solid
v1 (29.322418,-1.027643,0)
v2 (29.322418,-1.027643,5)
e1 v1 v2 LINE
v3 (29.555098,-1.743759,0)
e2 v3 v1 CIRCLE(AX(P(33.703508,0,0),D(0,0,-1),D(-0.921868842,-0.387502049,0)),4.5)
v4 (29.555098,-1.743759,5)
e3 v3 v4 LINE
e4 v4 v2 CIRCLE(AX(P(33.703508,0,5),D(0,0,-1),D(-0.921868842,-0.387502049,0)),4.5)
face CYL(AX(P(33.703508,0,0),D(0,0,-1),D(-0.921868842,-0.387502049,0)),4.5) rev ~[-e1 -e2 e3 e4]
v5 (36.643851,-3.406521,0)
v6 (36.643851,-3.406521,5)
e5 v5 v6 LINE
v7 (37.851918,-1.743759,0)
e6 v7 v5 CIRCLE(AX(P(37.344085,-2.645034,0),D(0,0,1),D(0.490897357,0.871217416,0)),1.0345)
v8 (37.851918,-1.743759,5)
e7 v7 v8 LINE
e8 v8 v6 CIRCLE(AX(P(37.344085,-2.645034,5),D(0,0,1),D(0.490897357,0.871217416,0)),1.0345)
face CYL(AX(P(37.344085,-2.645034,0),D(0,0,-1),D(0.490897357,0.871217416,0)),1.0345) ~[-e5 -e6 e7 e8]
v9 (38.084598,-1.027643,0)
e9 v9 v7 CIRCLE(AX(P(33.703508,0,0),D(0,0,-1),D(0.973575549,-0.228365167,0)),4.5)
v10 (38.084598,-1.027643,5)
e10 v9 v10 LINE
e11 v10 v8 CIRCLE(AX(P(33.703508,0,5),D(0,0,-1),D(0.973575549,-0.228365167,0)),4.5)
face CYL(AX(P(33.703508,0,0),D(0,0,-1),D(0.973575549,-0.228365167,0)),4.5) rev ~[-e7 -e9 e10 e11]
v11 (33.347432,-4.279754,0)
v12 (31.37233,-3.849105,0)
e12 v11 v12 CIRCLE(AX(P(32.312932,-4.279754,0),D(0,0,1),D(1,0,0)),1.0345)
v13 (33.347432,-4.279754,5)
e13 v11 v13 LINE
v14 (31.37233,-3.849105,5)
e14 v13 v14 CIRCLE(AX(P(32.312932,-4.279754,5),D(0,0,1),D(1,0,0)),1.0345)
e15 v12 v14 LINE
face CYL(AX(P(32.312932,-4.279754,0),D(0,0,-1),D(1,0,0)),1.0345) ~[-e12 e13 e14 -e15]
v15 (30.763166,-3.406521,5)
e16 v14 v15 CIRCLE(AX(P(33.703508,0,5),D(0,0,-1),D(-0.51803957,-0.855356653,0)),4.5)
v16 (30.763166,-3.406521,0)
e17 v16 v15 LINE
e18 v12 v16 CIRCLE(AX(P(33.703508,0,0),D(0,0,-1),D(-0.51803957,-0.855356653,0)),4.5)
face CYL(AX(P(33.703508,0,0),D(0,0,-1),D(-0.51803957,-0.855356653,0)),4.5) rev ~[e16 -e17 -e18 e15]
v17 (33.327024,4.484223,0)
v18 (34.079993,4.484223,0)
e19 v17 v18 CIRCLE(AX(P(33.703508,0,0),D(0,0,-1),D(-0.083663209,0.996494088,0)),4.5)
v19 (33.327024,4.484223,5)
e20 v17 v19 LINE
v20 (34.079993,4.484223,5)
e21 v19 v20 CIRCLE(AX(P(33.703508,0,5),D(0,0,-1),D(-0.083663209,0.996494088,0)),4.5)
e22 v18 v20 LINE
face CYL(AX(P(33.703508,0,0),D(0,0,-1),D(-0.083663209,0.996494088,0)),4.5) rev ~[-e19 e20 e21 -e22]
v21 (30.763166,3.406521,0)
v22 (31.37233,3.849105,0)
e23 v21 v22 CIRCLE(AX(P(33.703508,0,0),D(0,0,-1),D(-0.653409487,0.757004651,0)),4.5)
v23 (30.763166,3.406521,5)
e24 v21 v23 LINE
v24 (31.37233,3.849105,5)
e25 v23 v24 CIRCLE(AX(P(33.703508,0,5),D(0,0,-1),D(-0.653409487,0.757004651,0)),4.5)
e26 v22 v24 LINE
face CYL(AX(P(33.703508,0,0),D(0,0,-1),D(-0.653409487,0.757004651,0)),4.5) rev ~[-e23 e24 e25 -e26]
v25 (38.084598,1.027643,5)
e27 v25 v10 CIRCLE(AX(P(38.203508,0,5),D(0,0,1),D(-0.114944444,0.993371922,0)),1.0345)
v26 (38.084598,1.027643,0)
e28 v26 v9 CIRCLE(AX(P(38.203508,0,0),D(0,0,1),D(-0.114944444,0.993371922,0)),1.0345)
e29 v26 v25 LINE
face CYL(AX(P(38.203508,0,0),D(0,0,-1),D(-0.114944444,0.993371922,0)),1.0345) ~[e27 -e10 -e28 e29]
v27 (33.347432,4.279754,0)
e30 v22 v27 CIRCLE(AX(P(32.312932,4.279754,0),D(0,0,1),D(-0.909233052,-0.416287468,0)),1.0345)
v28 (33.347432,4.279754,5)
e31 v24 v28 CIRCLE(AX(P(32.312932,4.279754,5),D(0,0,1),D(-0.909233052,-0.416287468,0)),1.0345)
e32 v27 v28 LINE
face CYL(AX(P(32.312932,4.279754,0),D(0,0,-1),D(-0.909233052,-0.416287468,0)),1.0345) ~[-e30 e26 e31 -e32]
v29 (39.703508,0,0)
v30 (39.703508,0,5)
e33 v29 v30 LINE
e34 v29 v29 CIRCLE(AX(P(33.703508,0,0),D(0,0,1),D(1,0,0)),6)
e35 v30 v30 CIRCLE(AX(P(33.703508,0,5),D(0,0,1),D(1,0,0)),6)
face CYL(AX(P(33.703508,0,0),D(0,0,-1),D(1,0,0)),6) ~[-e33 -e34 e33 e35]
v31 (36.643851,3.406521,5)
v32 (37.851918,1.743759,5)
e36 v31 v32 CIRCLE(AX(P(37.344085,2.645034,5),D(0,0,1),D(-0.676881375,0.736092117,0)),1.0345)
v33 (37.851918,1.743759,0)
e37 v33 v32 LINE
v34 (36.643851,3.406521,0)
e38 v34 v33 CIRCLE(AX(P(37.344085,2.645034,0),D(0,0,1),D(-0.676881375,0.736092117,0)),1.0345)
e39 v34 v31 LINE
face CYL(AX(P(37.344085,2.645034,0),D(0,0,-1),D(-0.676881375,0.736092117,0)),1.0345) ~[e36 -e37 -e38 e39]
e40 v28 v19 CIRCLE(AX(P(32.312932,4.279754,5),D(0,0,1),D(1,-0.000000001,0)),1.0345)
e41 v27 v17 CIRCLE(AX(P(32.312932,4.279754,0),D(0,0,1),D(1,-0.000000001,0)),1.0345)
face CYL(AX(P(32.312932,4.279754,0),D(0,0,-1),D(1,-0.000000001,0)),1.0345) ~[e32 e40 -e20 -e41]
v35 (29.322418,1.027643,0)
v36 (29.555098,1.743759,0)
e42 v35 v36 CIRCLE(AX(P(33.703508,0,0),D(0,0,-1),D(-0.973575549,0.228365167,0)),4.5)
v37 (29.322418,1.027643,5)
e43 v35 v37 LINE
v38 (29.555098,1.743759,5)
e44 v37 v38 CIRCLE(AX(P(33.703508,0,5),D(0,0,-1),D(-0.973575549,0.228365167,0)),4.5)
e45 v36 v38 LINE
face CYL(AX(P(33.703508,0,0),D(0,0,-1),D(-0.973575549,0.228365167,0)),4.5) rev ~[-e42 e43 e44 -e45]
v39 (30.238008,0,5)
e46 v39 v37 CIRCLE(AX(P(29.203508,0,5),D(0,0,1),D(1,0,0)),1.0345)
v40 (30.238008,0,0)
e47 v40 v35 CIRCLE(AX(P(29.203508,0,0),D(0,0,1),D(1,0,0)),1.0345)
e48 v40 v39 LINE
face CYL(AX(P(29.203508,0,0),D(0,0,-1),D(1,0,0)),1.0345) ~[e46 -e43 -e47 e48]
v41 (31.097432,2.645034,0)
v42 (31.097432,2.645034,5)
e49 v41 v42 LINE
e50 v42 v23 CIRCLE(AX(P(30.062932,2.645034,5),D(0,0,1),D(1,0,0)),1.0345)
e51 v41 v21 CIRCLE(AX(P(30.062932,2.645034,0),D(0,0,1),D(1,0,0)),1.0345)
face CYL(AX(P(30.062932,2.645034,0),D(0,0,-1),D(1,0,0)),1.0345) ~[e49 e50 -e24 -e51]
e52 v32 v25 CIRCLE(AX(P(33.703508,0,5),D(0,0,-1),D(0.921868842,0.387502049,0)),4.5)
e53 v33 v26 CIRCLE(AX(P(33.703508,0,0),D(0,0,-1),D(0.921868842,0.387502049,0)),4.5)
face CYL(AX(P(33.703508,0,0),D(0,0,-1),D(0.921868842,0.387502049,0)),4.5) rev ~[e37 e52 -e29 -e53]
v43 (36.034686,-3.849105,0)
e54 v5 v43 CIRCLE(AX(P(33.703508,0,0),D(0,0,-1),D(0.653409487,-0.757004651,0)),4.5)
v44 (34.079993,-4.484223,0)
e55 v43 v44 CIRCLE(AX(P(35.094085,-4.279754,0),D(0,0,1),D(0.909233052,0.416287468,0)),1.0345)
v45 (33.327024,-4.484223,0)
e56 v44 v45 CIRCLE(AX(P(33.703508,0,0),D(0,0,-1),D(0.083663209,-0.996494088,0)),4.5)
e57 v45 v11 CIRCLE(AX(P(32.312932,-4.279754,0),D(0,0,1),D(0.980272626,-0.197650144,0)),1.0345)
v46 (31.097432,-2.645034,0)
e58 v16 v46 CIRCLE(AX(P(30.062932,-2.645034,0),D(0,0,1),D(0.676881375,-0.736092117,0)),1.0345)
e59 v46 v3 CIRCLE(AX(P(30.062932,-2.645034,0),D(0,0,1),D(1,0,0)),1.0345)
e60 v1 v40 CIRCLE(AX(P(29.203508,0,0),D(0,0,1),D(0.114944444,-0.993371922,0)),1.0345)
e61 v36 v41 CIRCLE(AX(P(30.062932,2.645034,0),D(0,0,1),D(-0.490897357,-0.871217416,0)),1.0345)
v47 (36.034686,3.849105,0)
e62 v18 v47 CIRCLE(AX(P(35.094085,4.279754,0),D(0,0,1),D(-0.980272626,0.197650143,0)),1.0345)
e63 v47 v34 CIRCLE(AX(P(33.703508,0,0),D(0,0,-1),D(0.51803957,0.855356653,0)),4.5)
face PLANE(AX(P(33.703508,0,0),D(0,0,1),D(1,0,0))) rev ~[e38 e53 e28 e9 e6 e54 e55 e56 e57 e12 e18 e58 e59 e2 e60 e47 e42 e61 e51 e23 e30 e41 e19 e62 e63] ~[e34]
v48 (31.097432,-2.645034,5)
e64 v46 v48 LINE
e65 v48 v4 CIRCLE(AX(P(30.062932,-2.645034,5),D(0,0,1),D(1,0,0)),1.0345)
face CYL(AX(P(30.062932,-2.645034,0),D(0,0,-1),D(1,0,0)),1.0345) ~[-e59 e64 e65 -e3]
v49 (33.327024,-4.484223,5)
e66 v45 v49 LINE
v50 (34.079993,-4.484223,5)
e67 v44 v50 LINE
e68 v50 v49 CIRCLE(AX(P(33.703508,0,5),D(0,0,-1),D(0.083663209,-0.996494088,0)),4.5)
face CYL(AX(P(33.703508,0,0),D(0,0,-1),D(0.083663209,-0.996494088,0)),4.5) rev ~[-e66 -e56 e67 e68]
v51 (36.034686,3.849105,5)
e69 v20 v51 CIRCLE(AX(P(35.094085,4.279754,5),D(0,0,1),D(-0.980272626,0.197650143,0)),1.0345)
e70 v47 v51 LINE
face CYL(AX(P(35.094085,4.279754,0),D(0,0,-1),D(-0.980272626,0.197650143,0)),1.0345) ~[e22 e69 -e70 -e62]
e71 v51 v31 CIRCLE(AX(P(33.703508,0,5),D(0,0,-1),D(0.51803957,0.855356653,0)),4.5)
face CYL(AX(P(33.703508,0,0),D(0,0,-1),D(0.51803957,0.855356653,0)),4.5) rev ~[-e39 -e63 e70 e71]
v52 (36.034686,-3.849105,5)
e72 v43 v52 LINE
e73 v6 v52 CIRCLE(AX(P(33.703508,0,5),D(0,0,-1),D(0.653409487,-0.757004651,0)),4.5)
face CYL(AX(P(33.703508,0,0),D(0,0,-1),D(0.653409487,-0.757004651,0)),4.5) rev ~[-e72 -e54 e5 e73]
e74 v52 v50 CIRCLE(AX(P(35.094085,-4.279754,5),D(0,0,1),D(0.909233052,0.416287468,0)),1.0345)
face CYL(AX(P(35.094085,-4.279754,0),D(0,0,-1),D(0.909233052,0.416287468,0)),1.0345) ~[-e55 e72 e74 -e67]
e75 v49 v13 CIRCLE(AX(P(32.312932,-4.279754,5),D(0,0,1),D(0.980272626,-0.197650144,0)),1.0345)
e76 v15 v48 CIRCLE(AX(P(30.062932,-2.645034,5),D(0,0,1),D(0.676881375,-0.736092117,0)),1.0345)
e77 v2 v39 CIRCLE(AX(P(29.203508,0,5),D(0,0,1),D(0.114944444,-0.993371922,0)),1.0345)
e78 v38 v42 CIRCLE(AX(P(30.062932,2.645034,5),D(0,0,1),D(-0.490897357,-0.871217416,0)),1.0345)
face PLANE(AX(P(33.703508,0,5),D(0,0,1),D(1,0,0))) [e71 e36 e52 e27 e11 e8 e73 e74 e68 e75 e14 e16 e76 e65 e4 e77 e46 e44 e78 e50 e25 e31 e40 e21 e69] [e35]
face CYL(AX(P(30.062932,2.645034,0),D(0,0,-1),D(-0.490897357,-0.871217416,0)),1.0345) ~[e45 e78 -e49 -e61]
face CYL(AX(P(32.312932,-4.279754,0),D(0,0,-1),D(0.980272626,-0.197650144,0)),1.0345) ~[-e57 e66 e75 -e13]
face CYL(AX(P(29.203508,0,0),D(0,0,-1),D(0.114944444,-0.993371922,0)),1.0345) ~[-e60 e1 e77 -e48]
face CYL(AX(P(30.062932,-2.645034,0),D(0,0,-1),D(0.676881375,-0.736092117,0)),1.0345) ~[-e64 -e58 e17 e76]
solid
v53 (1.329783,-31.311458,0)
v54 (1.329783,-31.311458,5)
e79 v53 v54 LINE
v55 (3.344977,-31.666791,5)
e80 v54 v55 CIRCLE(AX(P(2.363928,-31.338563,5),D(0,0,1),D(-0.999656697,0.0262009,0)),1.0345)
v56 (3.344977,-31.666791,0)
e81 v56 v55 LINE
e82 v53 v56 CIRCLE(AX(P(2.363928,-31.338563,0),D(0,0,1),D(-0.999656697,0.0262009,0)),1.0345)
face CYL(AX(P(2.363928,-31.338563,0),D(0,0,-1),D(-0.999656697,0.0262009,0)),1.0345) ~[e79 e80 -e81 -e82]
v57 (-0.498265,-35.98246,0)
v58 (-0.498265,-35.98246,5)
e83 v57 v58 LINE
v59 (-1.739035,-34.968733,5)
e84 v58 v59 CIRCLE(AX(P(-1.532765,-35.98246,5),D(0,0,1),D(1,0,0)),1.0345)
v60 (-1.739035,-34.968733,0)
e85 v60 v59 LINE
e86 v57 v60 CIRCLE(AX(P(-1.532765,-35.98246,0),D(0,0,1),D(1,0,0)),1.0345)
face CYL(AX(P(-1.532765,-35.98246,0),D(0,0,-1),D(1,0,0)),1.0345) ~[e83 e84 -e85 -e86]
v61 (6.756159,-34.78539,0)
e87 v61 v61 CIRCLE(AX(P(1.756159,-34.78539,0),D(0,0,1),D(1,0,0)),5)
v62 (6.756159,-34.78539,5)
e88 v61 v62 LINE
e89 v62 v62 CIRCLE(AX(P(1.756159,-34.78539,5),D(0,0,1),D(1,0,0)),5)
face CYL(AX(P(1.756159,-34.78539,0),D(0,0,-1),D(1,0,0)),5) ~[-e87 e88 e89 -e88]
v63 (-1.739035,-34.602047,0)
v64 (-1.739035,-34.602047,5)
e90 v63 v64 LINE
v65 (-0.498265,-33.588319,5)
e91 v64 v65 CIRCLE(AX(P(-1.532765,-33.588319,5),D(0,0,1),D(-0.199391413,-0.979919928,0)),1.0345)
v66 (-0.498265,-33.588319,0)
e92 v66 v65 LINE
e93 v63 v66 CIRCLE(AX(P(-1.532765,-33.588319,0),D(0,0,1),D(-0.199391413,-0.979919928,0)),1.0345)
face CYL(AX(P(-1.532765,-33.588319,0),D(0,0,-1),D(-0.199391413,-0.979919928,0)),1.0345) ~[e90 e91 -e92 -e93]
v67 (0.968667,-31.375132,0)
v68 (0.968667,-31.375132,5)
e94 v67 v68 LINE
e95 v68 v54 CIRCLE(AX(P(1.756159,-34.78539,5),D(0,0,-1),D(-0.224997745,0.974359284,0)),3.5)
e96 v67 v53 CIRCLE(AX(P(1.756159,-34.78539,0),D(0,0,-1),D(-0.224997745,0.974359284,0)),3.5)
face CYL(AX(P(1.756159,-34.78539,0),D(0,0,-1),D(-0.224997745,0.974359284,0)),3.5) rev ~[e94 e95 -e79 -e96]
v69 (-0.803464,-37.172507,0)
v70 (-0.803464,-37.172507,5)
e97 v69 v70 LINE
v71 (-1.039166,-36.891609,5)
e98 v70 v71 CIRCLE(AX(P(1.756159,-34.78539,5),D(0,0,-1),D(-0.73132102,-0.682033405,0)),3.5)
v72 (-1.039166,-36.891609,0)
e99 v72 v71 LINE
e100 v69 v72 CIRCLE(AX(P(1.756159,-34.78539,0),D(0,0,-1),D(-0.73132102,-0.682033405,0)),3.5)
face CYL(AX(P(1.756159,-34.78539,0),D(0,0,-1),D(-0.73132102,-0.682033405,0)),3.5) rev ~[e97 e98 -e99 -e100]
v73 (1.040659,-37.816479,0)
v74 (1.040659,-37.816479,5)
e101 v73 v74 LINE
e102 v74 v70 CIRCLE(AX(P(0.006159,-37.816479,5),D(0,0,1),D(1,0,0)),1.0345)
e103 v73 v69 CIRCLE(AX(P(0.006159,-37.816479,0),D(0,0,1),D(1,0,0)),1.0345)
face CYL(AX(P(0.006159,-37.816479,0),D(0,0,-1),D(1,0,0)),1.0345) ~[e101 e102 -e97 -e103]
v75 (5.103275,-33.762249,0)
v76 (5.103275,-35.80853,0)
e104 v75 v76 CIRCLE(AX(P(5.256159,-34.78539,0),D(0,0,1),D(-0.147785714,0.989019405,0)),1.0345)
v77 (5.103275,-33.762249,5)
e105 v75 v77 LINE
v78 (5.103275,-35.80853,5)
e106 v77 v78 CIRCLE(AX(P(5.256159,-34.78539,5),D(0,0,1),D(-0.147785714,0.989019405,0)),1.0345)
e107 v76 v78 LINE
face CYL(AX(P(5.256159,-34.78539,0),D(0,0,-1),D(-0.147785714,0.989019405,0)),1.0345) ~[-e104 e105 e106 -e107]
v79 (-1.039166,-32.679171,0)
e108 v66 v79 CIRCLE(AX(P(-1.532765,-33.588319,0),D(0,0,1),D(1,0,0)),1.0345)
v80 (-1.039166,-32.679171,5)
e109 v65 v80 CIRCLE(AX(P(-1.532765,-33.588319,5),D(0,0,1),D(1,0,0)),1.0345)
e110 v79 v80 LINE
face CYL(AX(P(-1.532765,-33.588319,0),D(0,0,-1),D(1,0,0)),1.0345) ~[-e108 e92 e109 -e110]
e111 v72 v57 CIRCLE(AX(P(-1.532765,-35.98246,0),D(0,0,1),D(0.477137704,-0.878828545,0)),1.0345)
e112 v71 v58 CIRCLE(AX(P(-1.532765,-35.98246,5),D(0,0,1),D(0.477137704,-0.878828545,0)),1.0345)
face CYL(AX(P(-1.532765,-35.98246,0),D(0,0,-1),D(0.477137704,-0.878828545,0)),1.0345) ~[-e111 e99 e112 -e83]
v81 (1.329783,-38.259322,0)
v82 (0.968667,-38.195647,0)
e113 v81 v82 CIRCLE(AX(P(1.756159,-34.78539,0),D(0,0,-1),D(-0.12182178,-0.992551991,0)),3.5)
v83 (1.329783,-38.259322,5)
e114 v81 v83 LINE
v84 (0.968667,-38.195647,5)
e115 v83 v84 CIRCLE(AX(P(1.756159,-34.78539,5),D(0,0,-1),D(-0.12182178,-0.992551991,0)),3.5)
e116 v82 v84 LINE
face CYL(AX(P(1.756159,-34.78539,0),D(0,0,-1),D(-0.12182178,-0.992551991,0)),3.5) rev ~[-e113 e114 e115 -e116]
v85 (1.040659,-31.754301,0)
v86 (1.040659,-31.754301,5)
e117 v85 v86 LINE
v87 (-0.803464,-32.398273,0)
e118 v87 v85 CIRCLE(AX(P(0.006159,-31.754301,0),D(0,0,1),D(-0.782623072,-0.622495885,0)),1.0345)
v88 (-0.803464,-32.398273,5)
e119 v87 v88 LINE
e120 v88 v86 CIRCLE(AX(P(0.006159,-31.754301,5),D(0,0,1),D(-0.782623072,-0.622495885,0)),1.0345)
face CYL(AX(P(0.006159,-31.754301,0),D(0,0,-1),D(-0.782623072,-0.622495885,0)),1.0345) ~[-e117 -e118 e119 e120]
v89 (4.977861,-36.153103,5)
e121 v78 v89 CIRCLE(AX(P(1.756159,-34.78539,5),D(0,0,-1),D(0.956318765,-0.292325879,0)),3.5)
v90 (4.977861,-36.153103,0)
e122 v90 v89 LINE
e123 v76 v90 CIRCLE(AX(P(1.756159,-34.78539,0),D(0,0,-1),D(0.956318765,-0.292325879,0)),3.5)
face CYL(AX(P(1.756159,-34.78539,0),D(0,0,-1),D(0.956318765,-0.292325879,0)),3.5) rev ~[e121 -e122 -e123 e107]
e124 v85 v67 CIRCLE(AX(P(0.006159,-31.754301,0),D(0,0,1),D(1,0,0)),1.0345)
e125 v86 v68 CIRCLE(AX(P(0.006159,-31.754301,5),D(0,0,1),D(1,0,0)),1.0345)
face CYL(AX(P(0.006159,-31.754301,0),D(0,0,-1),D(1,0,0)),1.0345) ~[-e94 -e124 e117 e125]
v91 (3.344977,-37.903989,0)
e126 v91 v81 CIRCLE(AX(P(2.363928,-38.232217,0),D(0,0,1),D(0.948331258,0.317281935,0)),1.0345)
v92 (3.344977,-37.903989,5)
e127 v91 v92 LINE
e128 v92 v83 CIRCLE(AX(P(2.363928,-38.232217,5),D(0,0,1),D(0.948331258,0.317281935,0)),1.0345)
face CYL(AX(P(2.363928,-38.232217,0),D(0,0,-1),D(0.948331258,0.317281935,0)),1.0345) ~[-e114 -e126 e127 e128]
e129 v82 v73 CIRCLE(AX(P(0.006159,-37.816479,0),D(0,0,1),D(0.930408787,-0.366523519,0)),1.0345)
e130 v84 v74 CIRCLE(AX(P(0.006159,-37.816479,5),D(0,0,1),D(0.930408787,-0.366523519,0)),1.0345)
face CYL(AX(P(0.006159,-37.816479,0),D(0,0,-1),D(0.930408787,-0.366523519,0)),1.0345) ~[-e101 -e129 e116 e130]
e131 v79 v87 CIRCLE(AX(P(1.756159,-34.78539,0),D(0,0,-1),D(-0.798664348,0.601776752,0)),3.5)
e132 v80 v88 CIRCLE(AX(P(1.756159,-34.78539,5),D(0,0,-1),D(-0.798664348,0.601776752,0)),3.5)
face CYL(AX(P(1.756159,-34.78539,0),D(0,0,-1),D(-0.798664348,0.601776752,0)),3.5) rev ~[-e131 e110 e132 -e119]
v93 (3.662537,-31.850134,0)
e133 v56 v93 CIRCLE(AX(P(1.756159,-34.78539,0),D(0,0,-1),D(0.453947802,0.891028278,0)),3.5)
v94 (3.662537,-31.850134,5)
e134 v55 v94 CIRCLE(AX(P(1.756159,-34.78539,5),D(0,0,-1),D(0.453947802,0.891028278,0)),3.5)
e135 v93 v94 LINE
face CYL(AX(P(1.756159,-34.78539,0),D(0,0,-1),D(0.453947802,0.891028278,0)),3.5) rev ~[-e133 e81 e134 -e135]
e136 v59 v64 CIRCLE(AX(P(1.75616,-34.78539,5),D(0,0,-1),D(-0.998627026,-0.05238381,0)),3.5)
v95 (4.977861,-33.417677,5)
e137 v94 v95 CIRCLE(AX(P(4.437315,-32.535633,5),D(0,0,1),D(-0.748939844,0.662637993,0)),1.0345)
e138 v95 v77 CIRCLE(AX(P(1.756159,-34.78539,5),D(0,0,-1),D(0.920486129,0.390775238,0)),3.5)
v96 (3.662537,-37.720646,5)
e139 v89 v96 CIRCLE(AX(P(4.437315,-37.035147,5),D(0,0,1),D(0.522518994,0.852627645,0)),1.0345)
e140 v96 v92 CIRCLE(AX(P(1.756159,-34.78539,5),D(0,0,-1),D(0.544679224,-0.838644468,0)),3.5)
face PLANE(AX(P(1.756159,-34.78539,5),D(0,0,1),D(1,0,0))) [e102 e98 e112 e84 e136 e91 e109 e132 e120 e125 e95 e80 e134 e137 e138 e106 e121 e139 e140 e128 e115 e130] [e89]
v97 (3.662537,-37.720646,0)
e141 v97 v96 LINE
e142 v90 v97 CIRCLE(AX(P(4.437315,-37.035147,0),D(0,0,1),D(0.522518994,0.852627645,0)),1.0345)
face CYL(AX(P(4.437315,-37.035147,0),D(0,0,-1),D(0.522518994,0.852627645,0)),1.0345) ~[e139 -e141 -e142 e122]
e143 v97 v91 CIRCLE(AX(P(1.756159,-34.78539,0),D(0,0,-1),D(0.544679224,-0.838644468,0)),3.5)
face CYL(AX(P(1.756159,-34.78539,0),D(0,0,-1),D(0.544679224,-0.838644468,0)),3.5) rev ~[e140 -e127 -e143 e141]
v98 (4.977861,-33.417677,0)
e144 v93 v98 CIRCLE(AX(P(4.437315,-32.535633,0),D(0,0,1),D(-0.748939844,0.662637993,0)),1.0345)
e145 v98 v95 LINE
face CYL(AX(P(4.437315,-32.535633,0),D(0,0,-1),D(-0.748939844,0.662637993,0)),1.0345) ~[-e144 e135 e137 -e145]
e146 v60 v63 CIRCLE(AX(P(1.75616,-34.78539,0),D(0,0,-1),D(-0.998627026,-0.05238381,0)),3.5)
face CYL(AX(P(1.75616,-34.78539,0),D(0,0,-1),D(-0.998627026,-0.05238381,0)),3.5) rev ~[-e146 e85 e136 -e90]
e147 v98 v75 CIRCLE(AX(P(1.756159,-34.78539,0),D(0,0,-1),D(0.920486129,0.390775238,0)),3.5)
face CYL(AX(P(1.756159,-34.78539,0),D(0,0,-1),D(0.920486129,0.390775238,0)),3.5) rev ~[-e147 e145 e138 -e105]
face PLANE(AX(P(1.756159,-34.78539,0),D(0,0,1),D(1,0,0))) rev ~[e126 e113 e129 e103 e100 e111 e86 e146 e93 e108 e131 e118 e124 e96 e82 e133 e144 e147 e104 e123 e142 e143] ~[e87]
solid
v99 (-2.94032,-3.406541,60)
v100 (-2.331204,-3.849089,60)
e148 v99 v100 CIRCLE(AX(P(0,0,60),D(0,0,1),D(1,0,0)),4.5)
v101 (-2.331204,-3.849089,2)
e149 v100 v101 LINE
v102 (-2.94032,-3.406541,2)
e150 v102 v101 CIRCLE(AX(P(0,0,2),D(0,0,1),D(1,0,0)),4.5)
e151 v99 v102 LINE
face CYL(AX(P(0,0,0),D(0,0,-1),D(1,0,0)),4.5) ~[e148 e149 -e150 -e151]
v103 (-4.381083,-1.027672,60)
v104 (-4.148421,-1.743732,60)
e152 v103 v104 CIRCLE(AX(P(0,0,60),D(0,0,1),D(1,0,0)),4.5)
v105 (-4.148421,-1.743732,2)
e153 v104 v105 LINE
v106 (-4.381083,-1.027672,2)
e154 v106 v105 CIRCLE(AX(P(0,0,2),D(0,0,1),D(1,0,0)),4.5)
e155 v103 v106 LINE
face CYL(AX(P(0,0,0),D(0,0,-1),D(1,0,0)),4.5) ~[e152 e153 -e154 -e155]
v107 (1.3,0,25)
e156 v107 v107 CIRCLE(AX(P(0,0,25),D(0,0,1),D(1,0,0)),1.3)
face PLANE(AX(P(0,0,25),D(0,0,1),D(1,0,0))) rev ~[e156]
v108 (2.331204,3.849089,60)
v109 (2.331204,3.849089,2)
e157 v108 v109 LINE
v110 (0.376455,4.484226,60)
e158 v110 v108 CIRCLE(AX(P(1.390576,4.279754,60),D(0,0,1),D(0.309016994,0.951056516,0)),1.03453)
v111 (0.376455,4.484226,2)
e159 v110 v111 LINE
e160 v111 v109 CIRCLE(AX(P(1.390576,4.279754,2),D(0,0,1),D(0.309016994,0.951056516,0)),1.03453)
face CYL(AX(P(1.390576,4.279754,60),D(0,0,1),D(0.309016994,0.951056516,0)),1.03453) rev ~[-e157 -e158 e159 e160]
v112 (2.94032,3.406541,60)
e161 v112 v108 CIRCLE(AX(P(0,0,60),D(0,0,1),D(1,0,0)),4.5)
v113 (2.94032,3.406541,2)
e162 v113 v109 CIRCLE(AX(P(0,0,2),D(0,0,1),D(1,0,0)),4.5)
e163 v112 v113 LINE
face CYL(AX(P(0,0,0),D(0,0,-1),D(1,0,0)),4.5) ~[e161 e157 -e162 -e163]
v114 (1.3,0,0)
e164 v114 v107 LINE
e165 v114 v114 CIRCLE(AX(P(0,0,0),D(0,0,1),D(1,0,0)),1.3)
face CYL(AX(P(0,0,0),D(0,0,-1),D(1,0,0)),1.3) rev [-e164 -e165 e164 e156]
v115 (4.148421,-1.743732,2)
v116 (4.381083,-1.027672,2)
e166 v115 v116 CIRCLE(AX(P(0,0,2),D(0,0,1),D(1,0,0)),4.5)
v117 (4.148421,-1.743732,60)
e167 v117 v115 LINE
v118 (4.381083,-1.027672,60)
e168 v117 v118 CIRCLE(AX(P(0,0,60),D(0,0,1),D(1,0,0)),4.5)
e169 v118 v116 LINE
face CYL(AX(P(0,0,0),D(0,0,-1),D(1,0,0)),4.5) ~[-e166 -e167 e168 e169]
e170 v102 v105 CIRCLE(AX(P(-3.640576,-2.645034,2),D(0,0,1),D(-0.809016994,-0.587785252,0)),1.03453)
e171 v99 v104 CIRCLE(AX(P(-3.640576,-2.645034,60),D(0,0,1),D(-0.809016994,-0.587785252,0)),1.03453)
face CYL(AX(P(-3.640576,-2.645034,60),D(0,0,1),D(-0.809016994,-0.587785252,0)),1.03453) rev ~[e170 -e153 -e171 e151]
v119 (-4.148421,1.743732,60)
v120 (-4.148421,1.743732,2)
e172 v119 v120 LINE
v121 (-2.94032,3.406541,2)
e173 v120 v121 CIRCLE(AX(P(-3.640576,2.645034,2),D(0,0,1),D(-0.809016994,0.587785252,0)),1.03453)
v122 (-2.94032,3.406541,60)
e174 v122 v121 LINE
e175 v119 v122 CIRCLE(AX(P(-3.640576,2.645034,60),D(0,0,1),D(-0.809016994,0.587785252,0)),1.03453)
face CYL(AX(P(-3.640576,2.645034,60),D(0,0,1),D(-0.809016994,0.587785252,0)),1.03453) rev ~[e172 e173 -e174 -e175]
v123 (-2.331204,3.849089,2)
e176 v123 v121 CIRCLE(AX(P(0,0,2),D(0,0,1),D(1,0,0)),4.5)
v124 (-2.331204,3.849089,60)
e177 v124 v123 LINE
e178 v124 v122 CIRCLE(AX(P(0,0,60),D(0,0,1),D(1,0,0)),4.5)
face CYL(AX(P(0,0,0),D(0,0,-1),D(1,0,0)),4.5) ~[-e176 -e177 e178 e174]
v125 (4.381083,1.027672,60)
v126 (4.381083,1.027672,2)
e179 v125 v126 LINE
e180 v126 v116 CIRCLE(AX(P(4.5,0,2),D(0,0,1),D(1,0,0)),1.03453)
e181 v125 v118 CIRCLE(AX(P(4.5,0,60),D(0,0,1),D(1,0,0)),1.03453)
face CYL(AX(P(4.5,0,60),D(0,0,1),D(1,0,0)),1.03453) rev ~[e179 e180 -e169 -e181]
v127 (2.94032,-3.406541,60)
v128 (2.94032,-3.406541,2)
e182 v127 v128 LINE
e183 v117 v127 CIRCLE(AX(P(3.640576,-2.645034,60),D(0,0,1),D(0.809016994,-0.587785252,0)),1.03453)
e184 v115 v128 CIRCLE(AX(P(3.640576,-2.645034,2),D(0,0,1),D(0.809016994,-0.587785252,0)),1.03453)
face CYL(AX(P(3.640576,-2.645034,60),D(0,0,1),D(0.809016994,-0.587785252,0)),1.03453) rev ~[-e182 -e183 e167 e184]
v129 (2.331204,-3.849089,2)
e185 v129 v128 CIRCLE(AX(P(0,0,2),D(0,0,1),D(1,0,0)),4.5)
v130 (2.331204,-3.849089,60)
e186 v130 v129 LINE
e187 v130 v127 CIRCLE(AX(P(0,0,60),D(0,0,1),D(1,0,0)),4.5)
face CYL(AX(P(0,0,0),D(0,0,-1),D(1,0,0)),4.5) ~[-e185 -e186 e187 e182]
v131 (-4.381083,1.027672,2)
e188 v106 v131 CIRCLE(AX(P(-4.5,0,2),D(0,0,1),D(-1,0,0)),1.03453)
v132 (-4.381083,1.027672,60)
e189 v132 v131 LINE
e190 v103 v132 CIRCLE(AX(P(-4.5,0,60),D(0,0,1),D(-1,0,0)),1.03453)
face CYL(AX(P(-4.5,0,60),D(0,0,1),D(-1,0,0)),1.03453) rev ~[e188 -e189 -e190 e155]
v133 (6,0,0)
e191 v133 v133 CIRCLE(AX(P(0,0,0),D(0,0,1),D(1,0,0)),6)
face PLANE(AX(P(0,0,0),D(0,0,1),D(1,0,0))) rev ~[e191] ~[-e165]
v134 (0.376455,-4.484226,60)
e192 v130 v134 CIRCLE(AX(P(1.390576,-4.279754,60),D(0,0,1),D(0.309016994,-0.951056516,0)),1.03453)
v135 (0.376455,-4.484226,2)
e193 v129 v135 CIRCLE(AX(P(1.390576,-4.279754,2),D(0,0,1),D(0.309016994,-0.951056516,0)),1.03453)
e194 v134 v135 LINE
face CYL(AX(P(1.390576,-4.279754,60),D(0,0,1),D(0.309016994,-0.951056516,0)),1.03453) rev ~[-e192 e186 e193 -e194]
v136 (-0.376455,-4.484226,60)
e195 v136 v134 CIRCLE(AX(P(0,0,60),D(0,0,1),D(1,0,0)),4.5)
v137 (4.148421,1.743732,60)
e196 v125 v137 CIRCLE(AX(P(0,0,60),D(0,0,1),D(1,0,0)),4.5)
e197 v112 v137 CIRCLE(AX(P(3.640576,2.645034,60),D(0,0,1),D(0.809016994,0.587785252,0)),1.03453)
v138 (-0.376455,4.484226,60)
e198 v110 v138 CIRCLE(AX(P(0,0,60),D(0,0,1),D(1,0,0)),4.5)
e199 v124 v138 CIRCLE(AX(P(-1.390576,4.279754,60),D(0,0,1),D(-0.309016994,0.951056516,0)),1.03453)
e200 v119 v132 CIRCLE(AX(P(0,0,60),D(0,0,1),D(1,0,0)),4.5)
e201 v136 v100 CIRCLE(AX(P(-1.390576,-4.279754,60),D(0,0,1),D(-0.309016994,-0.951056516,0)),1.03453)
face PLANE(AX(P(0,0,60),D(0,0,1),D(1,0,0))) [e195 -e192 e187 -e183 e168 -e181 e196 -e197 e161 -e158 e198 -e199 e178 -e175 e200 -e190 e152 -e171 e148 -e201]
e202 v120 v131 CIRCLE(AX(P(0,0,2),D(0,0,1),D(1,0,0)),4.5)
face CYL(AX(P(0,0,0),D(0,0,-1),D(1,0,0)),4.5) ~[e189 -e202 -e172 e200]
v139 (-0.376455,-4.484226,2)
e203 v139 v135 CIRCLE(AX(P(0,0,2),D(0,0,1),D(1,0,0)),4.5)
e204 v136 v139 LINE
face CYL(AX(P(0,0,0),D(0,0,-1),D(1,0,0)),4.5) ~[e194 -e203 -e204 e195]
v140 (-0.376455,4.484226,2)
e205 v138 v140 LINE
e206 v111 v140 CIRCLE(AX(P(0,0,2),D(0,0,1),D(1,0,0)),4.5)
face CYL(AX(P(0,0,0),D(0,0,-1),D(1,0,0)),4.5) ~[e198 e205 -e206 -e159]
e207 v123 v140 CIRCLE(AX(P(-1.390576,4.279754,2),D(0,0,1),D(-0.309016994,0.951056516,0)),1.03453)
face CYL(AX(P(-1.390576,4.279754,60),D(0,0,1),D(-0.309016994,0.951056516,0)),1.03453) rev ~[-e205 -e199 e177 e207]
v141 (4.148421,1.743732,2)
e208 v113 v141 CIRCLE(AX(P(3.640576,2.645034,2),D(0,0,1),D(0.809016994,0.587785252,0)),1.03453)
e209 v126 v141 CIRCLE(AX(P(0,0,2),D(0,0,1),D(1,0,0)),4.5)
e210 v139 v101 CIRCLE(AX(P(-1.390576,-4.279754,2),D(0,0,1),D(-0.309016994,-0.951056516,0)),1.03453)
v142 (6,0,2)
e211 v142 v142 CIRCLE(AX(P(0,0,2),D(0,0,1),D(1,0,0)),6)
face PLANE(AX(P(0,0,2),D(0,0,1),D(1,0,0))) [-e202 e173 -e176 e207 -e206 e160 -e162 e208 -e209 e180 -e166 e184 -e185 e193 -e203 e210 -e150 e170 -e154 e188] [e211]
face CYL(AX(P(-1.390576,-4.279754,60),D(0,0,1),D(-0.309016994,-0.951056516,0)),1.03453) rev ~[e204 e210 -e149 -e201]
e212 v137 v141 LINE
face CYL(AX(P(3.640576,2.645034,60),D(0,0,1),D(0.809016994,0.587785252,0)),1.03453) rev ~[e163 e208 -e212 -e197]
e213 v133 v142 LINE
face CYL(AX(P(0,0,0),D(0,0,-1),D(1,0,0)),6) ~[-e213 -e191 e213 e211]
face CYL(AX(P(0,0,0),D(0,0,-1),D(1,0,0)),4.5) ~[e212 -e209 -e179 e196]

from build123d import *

# Parameters (mm, degrees)
F0_R            = 4.5
F1_DEPTH        = 60
F0_R_2          = 6
F2_DEPTH        = 2
F3_R            = 1.0345297628
F4_DEPTH        = 58
F4_COPIES_COUNT = 10
F6_R            = 1.3
F7_DEPTH        = 25
F8_R            = 6
F9_DEPTH        = 5
F10_R           = 5
F11_DEPTH       = 5


# Not quite as in the source:
# - a pattern or mirror of a feature is missing from the dataset's text; its kind, count and spacing are read off the source's solid


with BuildPart() as f1:
    # F0 (on Top) → F1 (new body)
    with BuildSketch(Plane.XY):
        Circle(F0_R)
    extrude(amount=F1_DEPTH)

    # F0 (on Top) → F2 (join)
    with BuildSketch(Plane.XY):
        Circle(F0_R_2)
        Circle(F0_R, mode=Mode.SUBTRACT)
    extrude(amount=F2_DEPTH)

    # F3 (on face) → F4 (cut)
    with BuildSketch(Plane.XY.offset(60)):
        with Locations((4.5, 0)):
            Circle(F3_R)
    f4 = extrude(amount=-F4_DEPTH, mode=Mode.SUBTRACT)

    # F4_copies: F4 ×10 about axis
    f4_copies_axis = Axis((0, 0, 0), (0, 0, 1))
    for i in range(1, F4_COPIES_COUNT):
        add(f4.rotate(f4_copies_axis, i * 360 / F4_COPIES_COUNT), mode=Mode.SUBTRACT)

    # F6 (on face) → F7 (cut)
    with BuildSketch(Plane.XY):
        Circle(F6_R)
    extrude(amount=F7_DEPTH, mode=Mode.SUBTRACT)


with BuildPart() as f9:
    # F8 (on Top) → F9 (new body)
    with BuildSketch(Plane.XY):
        with Locations((33.7035082627, 0)):
            Circle(F8_R)
        with BuildLine():
            ThreePointArc((37.8519180528, 1.7437592189), (37.983262586, 1.3905764747), (38.0845982349, 1.0276432529))
            ThreePointArc((38.0845982349, 1.0276432529), (38.8916862289, 0.7723997261), (39.2380082627, 0))
            ThreePointArc((39.2380082627, 0), (38.8916862289, -0.7723997261), (38.0845982349, -1.0276432529))
            ThreePointArc((38.0845982349, -1.0276432529), (37.983262586, -1.3905764747), (37.8519180528, -1.7437592189))
            ThreePointArc((37.8519180528, -1.7437592189), (38.2372655183, -2.1230965293), (38.3785847374, -2.6450336353))
            ThreePointArc((38.3785847374, -2.6450336353), (37.7598962347, -3.5922881147), (36.6438509554, -3.4065209304))
            ThreePointArc((36.6438509554, -3.4065209304), (36.348541898, -3.6405764747), (36.0346863301, -3.8491049372))
            ThreePointArc((36.0346863301, -3.8491049372), (36.1048375751, -4.0593706779), (36.1285847374, -4.2797543233))
            ThreePointArc((36.1285847374, -4.2797543233), (35.1968272393, -5.3091396877), (34.0799927059, -4.4842233959))
            ThreePointArc((34.0799927059, -4.4842233959), (33.7035082627, -4.5), (33.3270238195, -4.4842233959))
            ThreePointArc((33.3270238195, -4.4842233959), (31.9932537074, -5.2636222894), (31.3723301953, -3.8491049372))
            ThreePointArc((31.3723301953, -3.8491049372), (31.0584746274, -3.6405764747), (30.76316557, -3.4065209304))
            ThreePointArc((30.76316557, -3.4065209304), (29.2260037074, -3.2530974788), (29.5550984726, -1.7437592189))
            ThreePointArc((29.5550984726, -1.7437592189), (29.4237539394, -1.3905764747), (29.3224182905, -1.0276432529))
            ThreePointArc((29.3224182905, -1.0276432529), (28.1690082627, 0), (29.3224182905, 1.0276432529))
            ThreePointArc((29.3224182905, 1.0276432529), (29.4237539394, 1.3905764747), (29.5550984726, 1.7437592189))
            ThreePointArc((29.5550984726, 1.7437592189), (29.2260037074, 3.2530974788), (30.76316557, 3.4065209304))
            ThreePointArc((30.76316557, 3.4065209304), (31.0584746274, 3.6405764747), (31.3723301953, 3.8491049372))
            ThreePointArc((31.3723301953, 3.8491049372), (31.9932537074, 5.2636222894), (33.3270238195, 4.4842233959))
            ThreePointArc((33.3270238195, 4.4842233959), (33.7035082627, 4.5), (34.0799927059, 4.4842233959))
            ThreePointArc((34.0799927059, 4.4842233959), (35.1968272393, 5.3091396877), (36.1285847374, 4.2797543233))
            ThreePointArc((36.1285847374, 4.2797543233), (36.1048375751, 4.0593706779), (36.0346863301, 3.8491049372))
            ThreePointArc((36.0346863301, 3.8491049372), (36.348541898, 3.6405764747), (36.6438509554, 3.4065209304))
            ThreePointArc((36.6438509554, 3.4065209304), (37.7598962347, 3.5922881147), (38.3785847374, 2.6450336353))
            ThreePointArc((38.3785847374, 2.6450336353), (38.2372655183, 2.1230965293), (37.8519180528, 1.7437592189))
        make_face(mode=Mode.SUBTRACT)
        with BuildLine():
            ThreePointArc((38.3785847374, -2.6450336353), (38.2372655183, -2.1230965293), (37.8519180528, -1.7437592189))
            ThreePointArc((37.8519180528, -1.7437592189), (37.3440847374, -2.6450336353), (36.6438509554, -3.4065209304))
            ThreePointArc((36.6438509554, -3.4065209304), (37.7598962347, -3.5922881147), (38.3785847374, -2.6450336353))
        make_face()
        with BuildLine():
            ThreePointArc((36.1285847374, -4.2797543233), (36.1048375751, -4.0593706779), (36.0346863301, -3.8491049372))
            ThreePointArc((36.0346863301, -3.8491049372), (35.0940847374, -4.2797543233), (34.0799927059, -4.4842233959))
            ThreePointArc((34.0799927059, -4.4842233959), (35.1968272393, -5.3091396877), (36.1285847374, -4.2797543233))
        make_face()
        with BuildLine():
            ThreePointArc((31.3723301953, -3.8491049372), (31.9932537074, -5.2636222894), (33.3270238195, -4.4842233959))
            ThreePointArc((33.3270238195, -4.4842233959), (32.312931788, -4.2797543233), (31.3723301953, -3.8491049372))
        make_face()
        with BuildLine():
            ThreePointArc((29.5550984726, -1.7437592189), (29.2260037074, -3.2530974788), (30.76316557, -3.4065209304))
            ThreePointArc((30.76316557, -3.4065209304), (30.062931788, -2.6450336353), (29.5550984726, -1.7437592189))
        make_face()
        with BuildLine():
            ThreePointArc((29.3224182905, -1.0276432529), (29.2035082627, 0), (29.3224182905, 1.0276432529))
            ThreePointArc((29.3224182905, 1.0276432529), (28.1690082627, 0), (29.3224182905, -1.0276432529))
        make_face()
        with BuildLine():
            ThreePointArc((29.5550984726, 1.7437592189), (30.062931788, 2.6450336353), (30.76316557, 3.4065209304))
            ThreePointArc((30.76316557, 3.4065209304), (29.2260037074, 3.2530974788), (29.5550984726, 1.7437592189))
        make_face()
        with BuildLine():
            ThreePointArc((31.3723301953, 3.8491049372), (32.312931788, 4.2797543233), (33.3270238195, 4.4842233959))
            ThreePointArc((33.3270238195, 4.4842233959), (31.9932537074, 5.2636222894), (31.3723301953, 3.8491049372))
        make_face()
        with BuildLine():
            ThreePointArc((34.0799927059, 4.4842233959), (35.0940847374, 4.2797543233), (36.0346863301, 3.8491049372))
            ThreePointArc((36.0346863301, 3.8491049372), (36.1048375751, 4.0593706779), (36.1285847374, 4.2797543233))
            ThreePointArc((36.1285847374, 4.2797543233), (35.1968272393, 5.3091396877), (34.0799927059, 4.4842233959))
        make_face()
        with BuildLine():
            ThreePointArc((36.6438509554, 3.4065209304), (37.3440847374, 2.6450336353), (37.8519180528, 1.7437592189))
            ThreePointArc((37.8519180528, 1.7437592189), (38.2372655183, 2.1230965293), (38.3785847374, 2.6450336353))
            ThreePointArc((38.3785847374, 2.6450336353), (37.7598962347, 3.5922881147), (36.6438509554, 3.4065209304))
        make_face()
        with BuildLine():
            ThreePointArc((38.0845982349, 1.0276432529), (38.1736819101, 0.51725), (38.2035082627, 0))
            ThreePointArc((38.2035082627, 0), (38.1736819101, -0.51725), (38.0845982349, -1.0276432529))
            ThreePointArc((38.0845982349, -1.0276432529), (38.8916862289, -0.7723997261), (39.2380082627, 0))
            ThreePointArc((39.2380082627, 0), (38.8916862289, 0.7723997261), (38.0845982349, 1.0276432529))
        make_face()
        with BuildLine():
            ThreePointArc((34.0799927059, -4.4842233959), (35.0940847374, -4.2797543233), (36.0346863301, -3.8491049372))
            ThreePointArc((36.0346863301, -3.8491049372), (34.7744066567, -3.2958863572), (34.0799927059, -4.4842233959))
        make_face()
        with BuildLine():
            ThreePointArc((31.3723301953, -3.8491049372), (32.312931788, -4.2797543233), (33.3270238195, -4.4842233959))
            ThreePointArc((33.3270238195, -4.4842233959), (33.3423171524, -4.3824968252), (33.347431788, -4.2797543233))
            ThreePointArc((33.347431788, -4.2797543233), (32.5333154334, -3.2690014857), (31.3723301953, -3.8491049372))
        make_face()
        with BuildLine():
            ThreePointArc((29.5550984726, -1.7437592189), (30.062931788, -2.6450336353), (30.76316557, -3.4065209304))
            ThreePointArc((30.76316557, -3.4065209304), (31.0101862674, -3.0608451326), (31.097431788, -2.6450336353))
            ThreePointArc((31.097431788, -2.6450336353), (30.584868894, -1.7518528544), (29.5550984726, -1.7437592189))
        make_face()
        with BuildLine():
            ThreePointArc((36.6438509554, -3.4065209304), (37.3440847374, -2.6450336353), (37.8519180528, -1.7437592189))
            ThreePointArc((37.8519180528, -1.7437592189), (36.5071566567, -2.0369697918), (36.6438509554, -3.4065209304))
        make_face()
        with BuildLine():
            ThreePointArc((30.2380082627, 0), (29.9759079888, 0.6881779662), (29.3224182905, 1.0276432529))
            ThreePointArc((29.3224182905, 1.0276432529), (29.2035082627, 0), (29.3224182905, -1.0276432529))
            ThreePointArc((29.3224182905, -1.0276432529), (29.9759079888, -0.6881779662), (30.2380082627, 0))
        make_face()
        with BuildLine():
            ThreePointArc((31.097431788, 2.6450336353), (31.0101862674, 3.0608451326), (30.76316557, 3.4065209304))
            ThreePointArc((30.76316557, 3.4065209304), (30.062931788, 2.6450336353), (29.5550984726, 1.7437592189))
            ThreePointArc((29.5550984726, 1.7437592189), (30.584868894, 1.7518528544), (31.097431788, 2.6450336353))
        make_face()
        with BuildLine():
            ThreePointArc((33.347431788, 4.2797543233), (33.3423171524, 4.3824968252), (33.3270238195, 4.4842233959))
            ThreePointArc((33.3270238195, 4.4842233959), (32.312931788, 4.2797543233), (31.3723301953, 3.8491049372))
            ThreePointArc((31.3723301953, 3.8491049372), (32.5333154334, 3.2690014857), (33.347431788, 4.2797543233))
        make_face()
        with BuildLine():
            ThreePointArc((34.0799927059, 4.4842233959), (34.7744066567, 3.2958863572), (36.0346863301, 3.8491049372))
            ThreePointArc((36.0346863301, 3.8491049372), (35.0940847374, 4.2797543233), (34.0799927059, 4.4842233959))
        make_face()
        with BuildLine():
            ThreePointArc((36.6438509554, 3.4065209304), (36.5071566567, 2.0369697918), (37.8519180528, 1.7437592189))
            ThreePointArc((37.8519180528, 1.7437592189), (37.3440847374, 2.6450336353), (36.6438509554, 3.4065209304))
        make_face()
        with BuildLine():
            ThreePointArc((38.0845982349, -1.0276432529), (38.1736819101, -0.51725), (38.2035082627, 0))
            ThreePointArc((38.2035082627, 0), (38.1736819101, 0.51725), (38.0845982349, 1.0276432529))
            ThreePointArc((38.0845982349, 1.0276432529), (37.1690082627, 0), (38.0845982349, -1.0276432529))
        make_face()
    extrude(amount=F9_DEPTH)


with BuildPart() as f11:
    # F10 (on Top) → F11 (new body)
    with BuildSketch(Plane.XY):
        with Locations((1.7561594723, -34.7853899002)):
            Circle(F10_R)
        with BuildLine():
            ThreePointArc((4.9778609223, -33.4176765651), (5.045083645, -33.5883193986), (5.1032751509, -33.7622493262))
            ThreePointArc((5.1032751509, -33.7622493262), (5.9314488249, -34.0016970138), (6.2906594723, -34.7853899002))
            ThreePointArc((6.2906594723, -34.7853899002), (5.9314488249, -35.5690827866), (5.1032751509, -35.8085304743))
            ThreePointArc((5.1032751509, -35.8085304743), (5.045083645, -35.9824604018), (4.9778609223, -36.1531032353))
            ThreePointArc((4.9778609223, -36.1531032353), (5.3399181981, -36.5296786729), (5.4718150232, -37.0351465341))
            ThreePointArc((5.4718150232, -37.0351465341), (4.8038406914, -38.0025395176), (3.6625367544, -37.7206455379))
            ThreePointArc((3.6625367544, -37.7206455379), (3.5061594723, -37.8164788135), (3.34497678, -37.9039888745))
            ThreePointArc((3.34497678, -37.9039888745), (3.3849778274, -38.0659410838), (3.3984280941, -38.2322170358))
            ThreePointArc((3.3984280941, -38.2322170358), (2.377481673, -39.2666282453), (1.3297832406, -38.2593218669))
            ThreePointArc((1.3297832406, -38.2593218669), (1.1483908504, -38.2322170358), (0.9686673618, -38.1956473943))
            ThreePointArc((0.9686673618, -38.1956473943), (-0.5110905277, -38.7123820937), (-0.8034640958, -37.1725068202))
            ThreePointArc((-0.8034640958, -37.1725068202), (-0.9249960786, -37.0351465341), (-1.039165746, -36.8916085318))
            ThreePointArc((-1.039165746, -36.8916085318), (-2.5048767167, -36.3362802401), (-1.7390351176, -34.9687332369))
            ThreePointArc((-1.7390351176, -34.9687332369), (-1.7438405277, -34.7853899002), (-1.7390351176, -34.6020465636))
            ThreePointArc((-1.7390351176, -34.6020465636), (-2.5048767167, -33.2344995603), (-1.039165746, -32.6791712686))
            ThreePointArc((-1.039165746, -32.6791712686), (-0.9249960786, -32.5356332663), (-0.8034640958, -32.3982729802))
            ThreePointArc((-0.8034640958, -32.3982729802), (-0.5110905277, -30.8583977067), (0.9686673618, -31.3751324061))
            ThreePointArc((0.9686673618, -31.3751324061), (1.1483908504, -31.3385627647), (1.3297832406, -31.3114579335))
            ThreePointArc((1.3297832406, -31.3114579335), (2.377481673, -30.3041515551), (3.3984280941, -31.3385627647))
            ThreePointArc((3.3984280941, -31.3385627647), (3.3849778274, -31.5048387166), (3.34497678, -31.6667909259))
            ThreePointArc((3.34497678, -31.6667909259), (3.5061594723, -31.754300987), (3.6625367544, -31.8501342626))
            ThreePointArc((3.6625367544, -31.8501342626), (4.8038406914, -31.5682402828), (5.4718150232, -32.5356332663))
            ThreePointArc((5.4718150232, -32.5356332663), (5.3399181981, -33.0411011275), (4.9778609223, -33.4176765651))
        make_face(mode=Mode.SUBTRACT)
        with BuildLine():
            ThreePointArc((1.3297832406, -31.3114579335), (2.3639280941, -31.3385627647), (3.34497678, -31.6667909259))
            ThreePointArc((3.34497678, -31.6667909259), (3.3849778274, -31.5048387166), (3.3984280941, -31.3385627647))
            ThreePointArc((3.3984280941, -31.3385627647), (2.377481673, -30.3041515551), (1.3297832406, -31.3114579335))
        make_face()
        with BuildLine():
            ThreePointArc((3.6625367544, -31.8501342626), (4.4373150232, -32.5356332663), (4.9778609223, -33.4176765651))
            ThreePointArc((4.9778609223, -33.4176765651), (5.3399181981, -33.0411011275), (5.4718150232, -32.5356332663))
            ThreePointArc((5.4718150232, -32.5356332663), (4.8038406914, -31.5682402828), (3.6625367544, -31.8501342626))
        make_face()
        with BuildLine():
            ThreePointArc((5.1032751509, -33.7622493262), (5.2177273883, -34.2681399002), (5.2561594723, -34.7853899002))
            ThreePointArc((5.2561594723, -34.7853899002), (5.2177273883, -35.3026399002), (5.1032751509, -35.8085304743))
            ThreePointArc((5.1032751509, -35.8085304743), (5.9314488249, -35.5690827866), (6.2906594723, -34.7853899002))
            ThreePointArc((6.2906594723, -34.7853899002), (5.9314488249, -34.0016970138), (5.1032751509, -33.7622493262))
        make_face()
        with BuildLine():
            ThreePointArc((5.4718150232, -37.0351465341), (5.3399181981, -36.5296786729), (4.9778609223, -36.1531032353))
            ThreePointArc((4.9778609223, -36.1531032353), (4.4373150232, -37.0351465341), (3.6625367544, -37.7206455379))
            ThreePointArc((3.6625367544, -37.7206455379), (4.8038406914, -38.0025395176), (5.4718150232, -37.0351465341))
        make_face()
        with BuildLine():
            ThreePointArc((3.3984280941, -38.2322170358), (3.3849778274, -38.0659410838), (3.34497678, -37.9039888745))
            ThreePointArc((3.34497678, -37.9039888745), (2.3639280941, -38.2322170358), (1.3297832406, -38.2593218669))
            ThreePointArc((1.3297832406, -38.2593218669), (2.377481673, -39.2666282453), (3.3984280941, -38.2322170358))
        make_face()
        with BuildLine():
            ThreePointArc((-0.8034640958, -37.1725068202), (-0.5110905277, -38.7123820937), (0.9686673618, -38.1956473943))
            ThreePointArc((0.9686673618, -38.1956473943), (0.0061594723, -37.8164788135), (-0.8034640958, -37.1725068202))
        make_face()
        with BuildLine():
            ThreePointArc((-1.7390351176, -34.9687332369), (-2.5048767167, -36.3362802401), (-1.039165746, -36.8916085318))
            ThreePointArc((-1.039165746, -36.8916085318), (-1.5327647005, -35.9824604018), (-1.7390351176, -34.9687332369))
        make_face()
        with BuildLine():
            ThreePointArc((-1.7390351176, -34.6020465636), (-1.5327647005, -33.5883193986), (-1.039165746, -32.6791712686))
            ThreePointArc((-1.039165746, -32.6791712686), (-2.5048767167, -33.2344995603), (-1.7390351176, -34.6020465636))
        make_face()
        with BuildLine():
            ThreePointArc((-0.8034640958, -32.3982729802), (0.0061594723, -31.754300987), (0.9686673618, -31.3751324061))
            ThreePointArc((0.9686673618, -31.3751324061), (-0.5110905277, -30.8583977067), (-0.8034640958, -32.3982729802))
        make_face()
        with BuildLine():
            ThreePointArc((1.3297832406, -31.3114579335), (2.1842890543, -32.3573463852), (3.34497678, -31.6667909259))
            ThreePointArc((3.34497678, -31.6667909259), (2.3639280941, -31.3385627647), (1.3297832406, -31.3114579335))
        make_face()
        with BuildLine():
            ThreePointArc((3.6625367544, -31.8501342626), (3.6448420468, -33.2005970485), (4.9778609223, -33.4176765651))
            ThreePointArc((4.9778609223, -33.4176765651), (4.4373150232, -32.5356332663), (3.6625367544, -31.8501342626))
        make_face()
        with BuildLine():
            ThreePointArc((5.1032751509, -35.8085304743), (5.2177273883, -35.3026399002), (5.2561594723, -34.7853899002))
            ThreePointArc((5.2561594723, -34.7853899002), (5.2177273883, -34.2681399002), (5.1032751509, -33.7622493262))
            ThreePointArc((5.1032751509, -33.7622493262), (4.2216594723, -34.7853899002), (5.1032751509, -35.8085304743))
        make_face()
        with BuildLine():
            ThreePointArc((1.3297832406, -38.2593218669), (2.3639280941, -38.2322170358), (3.34497678, -37.9039888745))
            ThreePointArc((3.34497678, -37.9039888745), (2.1842890543, -37.2134334153), (1.3297832406, -38.2593218669))
        make_face()
        with BuildLine():
            ThreePointArc((-0.8034640958, -37.1725068202), (0.0061594723, -37.8164788135), (0.9686673618, -38.1956473943))
            ThreePointArc((0.9686673618, -38.1956473943), (1.022502097, -38.0094501045), (1.0406594723, -37.8164788135))
            ThreePointArc((1.0406594723, -37.8164788135), (0.3472127444, -36.839814636), (-0.8034640958, -37.1725068202))
        make_face()
        with BuildLine():
            ThreePointArc((-1.7390351176, -34.9687332369), (-1.5327647005, -35.9824604018), (-1.039165746, -36.8916085318))
            ThreePointArc((-1.039165746, -36.8916085318), (-0.6437151044, -36.5114037502), (-0.4982647005, -35.9824604018))
            ThreePointArc((-0.4982647005, -35.9824604018), (-0.8782406354, -35.1813433703), (-1.7390351176, -34.9687332369))
        make_face()
        with BuildLine():
            ThreePointArc((-0.4982647005, -33.5883193986), (-0.6437151044, -33.0593760502), (-1.039165746, -32.6791712686))
            ThreePointArc((-1.039165746, -32.6791712686), (-1.5327647005, -33.5883193986), (-1.7390351176, -34.6020465636))
            ThreePointArc((-1.7390351176, -34.6020465636), (-0.8782406354, -34.3894364301), (-0.4982647005, -33.5883193986))
        make_face()
        with BuildLine():
            ThreePointArc((1.0406594723, -31.754300987), (1.022502097, -31.5613296959), (0.9686673618, -31.3751324061))
            ThreePointArc((0.9686673618, -31.3751324061), (0.0061594723, -31.754300987), (-0.8034640958, -32.3982729802))
            ThreePointArc((-0.8034640958, -32.3982729802), (0.3472127444, -32.7309651644), (1.0406594723, -31.754300987))
        make_face()
        with BuildLine():
            ThreePointArc((3.6625367544, -37.7206455379), (4.4373150232, -37.0351465341), (4.9778609223, -36.1531032353))
            ThreePointArc((4.9778609223, -36.1531032353), (3.6448420468, -36.3701827519), (3.6625367544, -37.7206455379))
        make_face()
    extrude(amount=F11_DEPTH)


solid = Compound([f1.part, f9.part, f11.part])
